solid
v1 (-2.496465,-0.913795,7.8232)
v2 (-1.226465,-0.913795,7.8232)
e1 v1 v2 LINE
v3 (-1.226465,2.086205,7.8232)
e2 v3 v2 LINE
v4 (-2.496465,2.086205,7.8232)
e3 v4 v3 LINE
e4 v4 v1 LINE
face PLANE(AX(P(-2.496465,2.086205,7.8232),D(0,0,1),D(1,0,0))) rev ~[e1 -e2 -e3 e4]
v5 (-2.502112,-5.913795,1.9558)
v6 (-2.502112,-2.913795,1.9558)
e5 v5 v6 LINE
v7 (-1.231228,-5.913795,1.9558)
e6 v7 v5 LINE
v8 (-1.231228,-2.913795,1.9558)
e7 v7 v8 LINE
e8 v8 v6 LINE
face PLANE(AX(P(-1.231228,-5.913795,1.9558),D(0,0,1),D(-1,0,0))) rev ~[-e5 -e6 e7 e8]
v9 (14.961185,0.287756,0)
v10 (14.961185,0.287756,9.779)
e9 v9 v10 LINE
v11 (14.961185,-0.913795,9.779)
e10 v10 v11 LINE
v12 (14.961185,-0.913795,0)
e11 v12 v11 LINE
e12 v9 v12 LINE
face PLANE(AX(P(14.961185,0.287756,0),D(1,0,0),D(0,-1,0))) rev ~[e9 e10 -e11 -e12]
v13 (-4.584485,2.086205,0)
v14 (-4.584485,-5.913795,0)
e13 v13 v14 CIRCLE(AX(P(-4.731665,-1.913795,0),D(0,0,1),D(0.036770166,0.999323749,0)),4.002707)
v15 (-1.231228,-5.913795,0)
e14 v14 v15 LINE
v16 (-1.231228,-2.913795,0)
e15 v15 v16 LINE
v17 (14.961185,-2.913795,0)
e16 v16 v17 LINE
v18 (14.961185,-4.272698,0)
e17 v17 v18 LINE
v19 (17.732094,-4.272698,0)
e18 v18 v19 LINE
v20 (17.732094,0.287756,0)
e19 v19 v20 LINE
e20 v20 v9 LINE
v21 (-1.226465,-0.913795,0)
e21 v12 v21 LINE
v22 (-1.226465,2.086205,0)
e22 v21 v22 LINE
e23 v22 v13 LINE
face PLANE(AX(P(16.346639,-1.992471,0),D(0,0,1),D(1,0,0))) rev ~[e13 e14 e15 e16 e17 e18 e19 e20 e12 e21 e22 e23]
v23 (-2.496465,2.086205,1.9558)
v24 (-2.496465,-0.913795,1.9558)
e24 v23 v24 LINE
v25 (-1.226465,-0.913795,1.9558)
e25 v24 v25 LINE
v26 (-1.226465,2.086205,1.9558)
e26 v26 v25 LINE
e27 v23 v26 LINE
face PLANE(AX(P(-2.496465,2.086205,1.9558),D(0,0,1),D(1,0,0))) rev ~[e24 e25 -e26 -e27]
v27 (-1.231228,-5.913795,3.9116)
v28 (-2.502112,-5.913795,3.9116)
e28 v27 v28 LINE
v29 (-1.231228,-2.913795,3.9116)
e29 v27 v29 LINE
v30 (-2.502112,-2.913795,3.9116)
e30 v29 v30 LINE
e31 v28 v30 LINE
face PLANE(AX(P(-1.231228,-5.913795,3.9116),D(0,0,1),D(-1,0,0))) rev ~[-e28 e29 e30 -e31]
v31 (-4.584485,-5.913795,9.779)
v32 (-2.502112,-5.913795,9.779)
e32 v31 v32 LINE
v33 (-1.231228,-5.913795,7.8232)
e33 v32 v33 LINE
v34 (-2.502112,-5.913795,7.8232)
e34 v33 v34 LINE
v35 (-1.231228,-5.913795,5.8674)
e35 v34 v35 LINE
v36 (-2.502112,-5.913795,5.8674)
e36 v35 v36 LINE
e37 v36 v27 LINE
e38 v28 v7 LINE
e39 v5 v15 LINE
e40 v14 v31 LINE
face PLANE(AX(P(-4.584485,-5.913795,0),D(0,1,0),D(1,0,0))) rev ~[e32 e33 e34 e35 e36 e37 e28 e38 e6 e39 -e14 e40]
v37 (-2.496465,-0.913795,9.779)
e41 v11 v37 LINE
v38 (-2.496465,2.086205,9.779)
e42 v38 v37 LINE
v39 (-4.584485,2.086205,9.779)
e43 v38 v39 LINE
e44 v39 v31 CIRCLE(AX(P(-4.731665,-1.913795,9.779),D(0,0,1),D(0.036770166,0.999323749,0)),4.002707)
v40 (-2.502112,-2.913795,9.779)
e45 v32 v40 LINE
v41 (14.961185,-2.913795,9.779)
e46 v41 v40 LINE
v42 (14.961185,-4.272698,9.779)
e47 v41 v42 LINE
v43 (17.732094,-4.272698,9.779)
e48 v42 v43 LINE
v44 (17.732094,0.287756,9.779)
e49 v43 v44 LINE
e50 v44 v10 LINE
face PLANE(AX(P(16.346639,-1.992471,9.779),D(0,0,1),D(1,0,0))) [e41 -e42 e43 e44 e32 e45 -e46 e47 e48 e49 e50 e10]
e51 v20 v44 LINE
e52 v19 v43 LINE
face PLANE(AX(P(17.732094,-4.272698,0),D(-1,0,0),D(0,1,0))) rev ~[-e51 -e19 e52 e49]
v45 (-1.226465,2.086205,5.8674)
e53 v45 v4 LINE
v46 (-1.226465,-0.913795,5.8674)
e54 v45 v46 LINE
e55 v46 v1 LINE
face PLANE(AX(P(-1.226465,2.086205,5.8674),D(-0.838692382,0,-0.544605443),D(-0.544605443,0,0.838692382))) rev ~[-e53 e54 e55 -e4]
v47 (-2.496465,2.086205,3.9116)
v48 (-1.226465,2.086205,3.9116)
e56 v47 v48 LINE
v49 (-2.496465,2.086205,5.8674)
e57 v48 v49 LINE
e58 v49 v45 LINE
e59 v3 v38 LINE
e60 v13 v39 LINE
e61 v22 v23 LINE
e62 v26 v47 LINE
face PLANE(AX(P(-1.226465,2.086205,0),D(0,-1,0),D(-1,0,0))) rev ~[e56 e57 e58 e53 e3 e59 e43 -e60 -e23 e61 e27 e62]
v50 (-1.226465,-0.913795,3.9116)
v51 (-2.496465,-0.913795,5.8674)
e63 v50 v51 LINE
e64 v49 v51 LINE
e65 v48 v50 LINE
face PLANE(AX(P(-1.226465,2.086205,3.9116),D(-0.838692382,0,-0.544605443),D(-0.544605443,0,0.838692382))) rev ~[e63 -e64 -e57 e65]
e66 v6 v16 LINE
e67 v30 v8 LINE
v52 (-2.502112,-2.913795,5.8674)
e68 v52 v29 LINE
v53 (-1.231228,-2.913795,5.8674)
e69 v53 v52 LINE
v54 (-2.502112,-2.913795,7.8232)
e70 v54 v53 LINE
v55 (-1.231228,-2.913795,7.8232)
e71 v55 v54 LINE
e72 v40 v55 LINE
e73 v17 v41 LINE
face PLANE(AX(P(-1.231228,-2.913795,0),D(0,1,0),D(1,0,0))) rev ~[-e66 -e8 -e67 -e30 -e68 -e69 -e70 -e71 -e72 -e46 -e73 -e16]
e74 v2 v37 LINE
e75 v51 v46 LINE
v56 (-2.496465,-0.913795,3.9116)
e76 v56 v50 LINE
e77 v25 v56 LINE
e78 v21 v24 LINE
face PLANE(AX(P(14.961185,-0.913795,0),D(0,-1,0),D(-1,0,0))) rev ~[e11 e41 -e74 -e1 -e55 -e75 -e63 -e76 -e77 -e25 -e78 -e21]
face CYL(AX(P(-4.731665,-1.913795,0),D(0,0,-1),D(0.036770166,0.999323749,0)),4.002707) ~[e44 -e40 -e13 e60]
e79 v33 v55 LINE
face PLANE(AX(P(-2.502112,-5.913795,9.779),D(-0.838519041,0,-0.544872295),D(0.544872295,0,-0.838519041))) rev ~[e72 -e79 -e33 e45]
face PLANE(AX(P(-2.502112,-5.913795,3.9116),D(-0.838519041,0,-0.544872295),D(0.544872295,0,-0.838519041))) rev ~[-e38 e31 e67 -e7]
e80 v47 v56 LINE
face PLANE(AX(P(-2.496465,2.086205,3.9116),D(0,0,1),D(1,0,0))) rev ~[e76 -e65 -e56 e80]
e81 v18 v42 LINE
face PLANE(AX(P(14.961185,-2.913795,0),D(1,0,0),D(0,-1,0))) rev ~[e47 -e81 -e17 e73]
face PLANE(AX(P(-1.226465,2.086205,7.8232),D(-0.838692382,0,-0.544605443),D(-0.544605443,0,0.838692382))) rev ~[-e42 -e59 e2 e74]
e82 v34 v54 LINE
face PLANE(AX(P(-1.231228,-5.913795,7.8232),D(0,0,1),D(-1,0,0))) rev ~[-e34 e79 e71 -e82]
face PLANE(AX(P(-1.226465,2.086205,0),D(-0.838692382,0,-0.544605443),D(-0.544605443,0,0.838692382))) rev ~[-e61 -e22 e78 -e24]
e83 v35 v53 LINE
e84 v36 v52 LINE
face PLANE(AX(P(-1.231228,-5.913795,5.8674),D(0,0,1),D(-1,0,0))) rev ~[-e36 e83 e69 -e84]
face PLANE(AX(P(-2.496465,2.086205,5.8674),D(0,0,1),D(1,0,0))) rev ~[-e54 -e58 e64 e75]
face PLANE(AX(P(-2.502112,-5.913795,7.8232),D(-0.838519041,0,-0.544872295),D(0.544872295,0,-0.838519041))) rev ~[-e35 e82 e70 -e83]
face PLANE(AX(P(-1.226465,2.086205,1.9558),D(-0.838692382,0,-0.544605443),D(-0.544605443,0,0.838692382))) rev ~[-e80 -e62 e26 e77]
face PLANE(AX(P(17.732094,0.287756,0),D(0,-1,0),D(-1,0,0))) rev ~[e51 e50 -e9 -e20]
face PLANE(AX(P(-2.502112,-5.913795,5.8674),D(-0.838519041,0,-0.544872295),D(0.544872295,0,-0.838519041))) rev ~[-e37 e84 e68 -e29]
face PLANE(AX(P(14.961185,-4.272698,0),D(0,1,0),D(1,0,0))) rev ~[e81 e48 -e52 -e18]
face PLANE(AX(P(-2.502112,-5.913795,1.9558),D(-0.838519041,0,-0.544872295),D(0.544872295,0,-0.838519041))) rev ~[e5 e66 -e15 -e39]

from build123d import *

# Parameters (mm, degrees)
F0_W     = 1.9128494449
F0_H     = 2
F1_DEPTH = 9.779
F3_DEPTH = 3
F5_DEPTH = 3


# Not quite as in the source:
# - a feature names something its author has since deleted; it is built from what else it names


with BuildPart() as f1:
    # F0 (on Top) → F1 (new body)
    with BuildSketch(Plane.XY):
        Polygon((14.9611846233, 0.28775621), (14.9611846233, -0.9137945543), (14.9611846233, -2.9137945543), (14.9611846233, -4.2726983058), (17.7320937316, -4.2726983058), (17.7320937316, 0.28775621), align=None)
        with BuildLine():
            Line((13.0483351785, -0.9137945543), (-0.8558859308, -0.9137945543))
            ThreePointArc((-0.8558859308, -0.9137945543), (-0.7608167592, -1.4097829714), (-0.7289579861, -1.9137945543))
            ThreePointArc((-0.7289579861, -1.9137945543), (-0.7608167592, -2.4178061373), (-0.8558859308, -2.9137945543))
            Line((-0.8558859308, -2.9137945543), (13.0483351785, -2.9137945543))
            Line((13.0483351785, -2.9137945543), (13.0483351785, -0.9137945543))
        make_face()
        with Locations((14.0047599009, -1.9137945543)):
            Rectangle(F0_W, F0_H)
        with BuildLine():
            Line((-4.7316648215, -2.9137945543), (-4.7316648215, -0.9137945543))
            Line((-4.7316648215, -0.9137945543), (-4.7316648215, 2.0862054457))
            Line((-4.7316648215, 2.0862054457), (-4.5844846254, 2.0862054457))
            ThreePointArc((-4.5844846254, 2.0862054457), (-8.7343716569, -1.9137945543), (-4.5844846254, -5.9137945543))
            Line((-4.5844846254, -5.9137945543), (-4.7316648215, -5.9137945543))
            Line((-4.7316648215, -5.9137945543), (-4.7316648215, -2.9137945543))
        make_face()
        with BuildLine():
            Line((-1.2312275376, -2.9137945543), (-4.7316648215, -2.9137945543))
            Line((-4.7316648215, -2.9137945543), (-4.7316648215, -5.9137945543))
            Line((-4.7316648215, -5.9137945543), (-4.5844846254, -5.9137945543))
            ThreePointArc((-4.5844846254, -5.9137945543), (-2.6374223247, -5.3249249204), (-1.2312275376, -3.8550830006))
            Line((-1.2312275376, -3.8550830006), (-1.2312275376, -2.9137945543))
        make_face()
        with BuildLine():
            Line((-4.7316648215, 2.0862054457), (-4.7316648215, -0.9137945543))
            Line((-4.7316648215, -0.9137945543), (-1.2264648215, -0.9137945543))
            Line((-1.2264648215, -0.9137945543), (-1.2264648215, 0.0188810444))
            ThreePointArc((-1.2264648215, 0.0188810444), (-2.6332302099, 1.4947585391), (-4.5844846254, 2.0862054457))
            Line((-4.5844846254, 2.0862054457), (-4.7316648215, 2.0862054457))
        make_face()
        with BuildLine():
            Line((-1.2264648215, -0.9137945543), (-4.7316648215, -0.9137945543))
            Line((-4.7316648215, -0.9137945543), (-4.7316648215, -2.9137945543))
            Line((-4.7316648215, -2.9137945543), (-1.2312275376, -2.9137945543))
            Line((-1.2312275376, -2.9137945543), (-0.8558859308, -2.9137945543))
            ThreePointArc((-0.8558859308, -2.9137945543), (-0.7608167592, -2.4178061373), (-0.7289579861, -1.9137945543))
            ThreePointArc((-0.7289579861, -1.9137945543), (-0.7608167592, -1.4097829714), (-0.8558859308, -0.9137945543))
            Line((-0.8558859308, -0.9137945543), (-1.2264648215, -0.9137945543))
        make_face()
        with BuildLine():
            Line((-1.2312275376, -5.9137945543), (-1.2312275376, -3.8550830006))
            ThreePointArc((-1.2312275376, -3.8550830006), (-2.6374223247, -5.3249249204), (-4.5844846254, -5.9137945543))
            Line((-4.5844846254, -5.9137945543), (-1.2312275376, -5.9137945543))
        make_face()
        with BuildLine():
            ThreePointArc((-4.5844846254, 2.0862054457), (-2.6332302099, 1.4947585391), (-1.2264648215, 0.0188810444))
            Line((-1.2264648215, 0.0188810444), (-1.2264648215, 2.0862054457))
            Line((-1.2264648215, 2.0862054457), (-4.5844846254, 2.0862054457))
        make_face()
    extrude(amount=F1_DEPTH)

    # F2 (on face) → F3 (cut)
    with BuildSketch(Plane.XZ.offset(5.9137945543)):
        Polygon((-1.2312275376, 0), (-1.2312275376, 1.9558), (-2.5021124942, 1.9558), align=None)
        Polygon((-1.2312275376, 1.9558), (-1.2312275376, 3.9116), (-2.5021124942, 3.9116), align=None)
        Polygon((-1.2312275376, 4.8895), (-1.2312275376, 5.8674), (-2.5021124942, 5.8674), (-1.2312275376, 3.9116), align=None)
        Polygon((-1.2312275376, 5.8674), (-1.2312275376, 7.8232), (-2.5021124942, 7.8232), align=None)
        Polygon((-1.2312275376, 9.779), (-2.5021124942, 9.779), (-1.2312275376, 7.8232), align=None)
    extrude(amount=-F3_DEPTH, mode=Mode.SUBTRACT)

    # F4 (on face) → F5 (cut)
    with BuildSketch(Plane(origin=(0, 2.0862054457, 0), x_dir=(-1, 0, 0), z_dir=(0, 1, 0))):
        Polygon((1.2264648215, 9.779), (1.2264648215, 7.8232), (2.4964648215, 9.779), align=None)
        Polygon((1.2264648215, 7.8232), (1.2264648215, 5.8674), (2.4964648215, 7.8232), align=None)
        Polygon((1.2264648215, 4.8895), (1.2264648215, 3.9116), (2.4964648215, 5.8674), (1.2264648215, 5.8674), align=None)
        Polygon((1.2264648215, 3.9116), (1.2264648215, 1.9558), (2.4964648215, 3.9116), align=None)
        Polygon((1.2264648215, 1.9558), (1.2264648215, 0), (2.4964648215, 1.9558), align=None)
    extrude(amount=-F5_DEPTH, mode=Mode.SUBTRACT)


solid = f1.part
